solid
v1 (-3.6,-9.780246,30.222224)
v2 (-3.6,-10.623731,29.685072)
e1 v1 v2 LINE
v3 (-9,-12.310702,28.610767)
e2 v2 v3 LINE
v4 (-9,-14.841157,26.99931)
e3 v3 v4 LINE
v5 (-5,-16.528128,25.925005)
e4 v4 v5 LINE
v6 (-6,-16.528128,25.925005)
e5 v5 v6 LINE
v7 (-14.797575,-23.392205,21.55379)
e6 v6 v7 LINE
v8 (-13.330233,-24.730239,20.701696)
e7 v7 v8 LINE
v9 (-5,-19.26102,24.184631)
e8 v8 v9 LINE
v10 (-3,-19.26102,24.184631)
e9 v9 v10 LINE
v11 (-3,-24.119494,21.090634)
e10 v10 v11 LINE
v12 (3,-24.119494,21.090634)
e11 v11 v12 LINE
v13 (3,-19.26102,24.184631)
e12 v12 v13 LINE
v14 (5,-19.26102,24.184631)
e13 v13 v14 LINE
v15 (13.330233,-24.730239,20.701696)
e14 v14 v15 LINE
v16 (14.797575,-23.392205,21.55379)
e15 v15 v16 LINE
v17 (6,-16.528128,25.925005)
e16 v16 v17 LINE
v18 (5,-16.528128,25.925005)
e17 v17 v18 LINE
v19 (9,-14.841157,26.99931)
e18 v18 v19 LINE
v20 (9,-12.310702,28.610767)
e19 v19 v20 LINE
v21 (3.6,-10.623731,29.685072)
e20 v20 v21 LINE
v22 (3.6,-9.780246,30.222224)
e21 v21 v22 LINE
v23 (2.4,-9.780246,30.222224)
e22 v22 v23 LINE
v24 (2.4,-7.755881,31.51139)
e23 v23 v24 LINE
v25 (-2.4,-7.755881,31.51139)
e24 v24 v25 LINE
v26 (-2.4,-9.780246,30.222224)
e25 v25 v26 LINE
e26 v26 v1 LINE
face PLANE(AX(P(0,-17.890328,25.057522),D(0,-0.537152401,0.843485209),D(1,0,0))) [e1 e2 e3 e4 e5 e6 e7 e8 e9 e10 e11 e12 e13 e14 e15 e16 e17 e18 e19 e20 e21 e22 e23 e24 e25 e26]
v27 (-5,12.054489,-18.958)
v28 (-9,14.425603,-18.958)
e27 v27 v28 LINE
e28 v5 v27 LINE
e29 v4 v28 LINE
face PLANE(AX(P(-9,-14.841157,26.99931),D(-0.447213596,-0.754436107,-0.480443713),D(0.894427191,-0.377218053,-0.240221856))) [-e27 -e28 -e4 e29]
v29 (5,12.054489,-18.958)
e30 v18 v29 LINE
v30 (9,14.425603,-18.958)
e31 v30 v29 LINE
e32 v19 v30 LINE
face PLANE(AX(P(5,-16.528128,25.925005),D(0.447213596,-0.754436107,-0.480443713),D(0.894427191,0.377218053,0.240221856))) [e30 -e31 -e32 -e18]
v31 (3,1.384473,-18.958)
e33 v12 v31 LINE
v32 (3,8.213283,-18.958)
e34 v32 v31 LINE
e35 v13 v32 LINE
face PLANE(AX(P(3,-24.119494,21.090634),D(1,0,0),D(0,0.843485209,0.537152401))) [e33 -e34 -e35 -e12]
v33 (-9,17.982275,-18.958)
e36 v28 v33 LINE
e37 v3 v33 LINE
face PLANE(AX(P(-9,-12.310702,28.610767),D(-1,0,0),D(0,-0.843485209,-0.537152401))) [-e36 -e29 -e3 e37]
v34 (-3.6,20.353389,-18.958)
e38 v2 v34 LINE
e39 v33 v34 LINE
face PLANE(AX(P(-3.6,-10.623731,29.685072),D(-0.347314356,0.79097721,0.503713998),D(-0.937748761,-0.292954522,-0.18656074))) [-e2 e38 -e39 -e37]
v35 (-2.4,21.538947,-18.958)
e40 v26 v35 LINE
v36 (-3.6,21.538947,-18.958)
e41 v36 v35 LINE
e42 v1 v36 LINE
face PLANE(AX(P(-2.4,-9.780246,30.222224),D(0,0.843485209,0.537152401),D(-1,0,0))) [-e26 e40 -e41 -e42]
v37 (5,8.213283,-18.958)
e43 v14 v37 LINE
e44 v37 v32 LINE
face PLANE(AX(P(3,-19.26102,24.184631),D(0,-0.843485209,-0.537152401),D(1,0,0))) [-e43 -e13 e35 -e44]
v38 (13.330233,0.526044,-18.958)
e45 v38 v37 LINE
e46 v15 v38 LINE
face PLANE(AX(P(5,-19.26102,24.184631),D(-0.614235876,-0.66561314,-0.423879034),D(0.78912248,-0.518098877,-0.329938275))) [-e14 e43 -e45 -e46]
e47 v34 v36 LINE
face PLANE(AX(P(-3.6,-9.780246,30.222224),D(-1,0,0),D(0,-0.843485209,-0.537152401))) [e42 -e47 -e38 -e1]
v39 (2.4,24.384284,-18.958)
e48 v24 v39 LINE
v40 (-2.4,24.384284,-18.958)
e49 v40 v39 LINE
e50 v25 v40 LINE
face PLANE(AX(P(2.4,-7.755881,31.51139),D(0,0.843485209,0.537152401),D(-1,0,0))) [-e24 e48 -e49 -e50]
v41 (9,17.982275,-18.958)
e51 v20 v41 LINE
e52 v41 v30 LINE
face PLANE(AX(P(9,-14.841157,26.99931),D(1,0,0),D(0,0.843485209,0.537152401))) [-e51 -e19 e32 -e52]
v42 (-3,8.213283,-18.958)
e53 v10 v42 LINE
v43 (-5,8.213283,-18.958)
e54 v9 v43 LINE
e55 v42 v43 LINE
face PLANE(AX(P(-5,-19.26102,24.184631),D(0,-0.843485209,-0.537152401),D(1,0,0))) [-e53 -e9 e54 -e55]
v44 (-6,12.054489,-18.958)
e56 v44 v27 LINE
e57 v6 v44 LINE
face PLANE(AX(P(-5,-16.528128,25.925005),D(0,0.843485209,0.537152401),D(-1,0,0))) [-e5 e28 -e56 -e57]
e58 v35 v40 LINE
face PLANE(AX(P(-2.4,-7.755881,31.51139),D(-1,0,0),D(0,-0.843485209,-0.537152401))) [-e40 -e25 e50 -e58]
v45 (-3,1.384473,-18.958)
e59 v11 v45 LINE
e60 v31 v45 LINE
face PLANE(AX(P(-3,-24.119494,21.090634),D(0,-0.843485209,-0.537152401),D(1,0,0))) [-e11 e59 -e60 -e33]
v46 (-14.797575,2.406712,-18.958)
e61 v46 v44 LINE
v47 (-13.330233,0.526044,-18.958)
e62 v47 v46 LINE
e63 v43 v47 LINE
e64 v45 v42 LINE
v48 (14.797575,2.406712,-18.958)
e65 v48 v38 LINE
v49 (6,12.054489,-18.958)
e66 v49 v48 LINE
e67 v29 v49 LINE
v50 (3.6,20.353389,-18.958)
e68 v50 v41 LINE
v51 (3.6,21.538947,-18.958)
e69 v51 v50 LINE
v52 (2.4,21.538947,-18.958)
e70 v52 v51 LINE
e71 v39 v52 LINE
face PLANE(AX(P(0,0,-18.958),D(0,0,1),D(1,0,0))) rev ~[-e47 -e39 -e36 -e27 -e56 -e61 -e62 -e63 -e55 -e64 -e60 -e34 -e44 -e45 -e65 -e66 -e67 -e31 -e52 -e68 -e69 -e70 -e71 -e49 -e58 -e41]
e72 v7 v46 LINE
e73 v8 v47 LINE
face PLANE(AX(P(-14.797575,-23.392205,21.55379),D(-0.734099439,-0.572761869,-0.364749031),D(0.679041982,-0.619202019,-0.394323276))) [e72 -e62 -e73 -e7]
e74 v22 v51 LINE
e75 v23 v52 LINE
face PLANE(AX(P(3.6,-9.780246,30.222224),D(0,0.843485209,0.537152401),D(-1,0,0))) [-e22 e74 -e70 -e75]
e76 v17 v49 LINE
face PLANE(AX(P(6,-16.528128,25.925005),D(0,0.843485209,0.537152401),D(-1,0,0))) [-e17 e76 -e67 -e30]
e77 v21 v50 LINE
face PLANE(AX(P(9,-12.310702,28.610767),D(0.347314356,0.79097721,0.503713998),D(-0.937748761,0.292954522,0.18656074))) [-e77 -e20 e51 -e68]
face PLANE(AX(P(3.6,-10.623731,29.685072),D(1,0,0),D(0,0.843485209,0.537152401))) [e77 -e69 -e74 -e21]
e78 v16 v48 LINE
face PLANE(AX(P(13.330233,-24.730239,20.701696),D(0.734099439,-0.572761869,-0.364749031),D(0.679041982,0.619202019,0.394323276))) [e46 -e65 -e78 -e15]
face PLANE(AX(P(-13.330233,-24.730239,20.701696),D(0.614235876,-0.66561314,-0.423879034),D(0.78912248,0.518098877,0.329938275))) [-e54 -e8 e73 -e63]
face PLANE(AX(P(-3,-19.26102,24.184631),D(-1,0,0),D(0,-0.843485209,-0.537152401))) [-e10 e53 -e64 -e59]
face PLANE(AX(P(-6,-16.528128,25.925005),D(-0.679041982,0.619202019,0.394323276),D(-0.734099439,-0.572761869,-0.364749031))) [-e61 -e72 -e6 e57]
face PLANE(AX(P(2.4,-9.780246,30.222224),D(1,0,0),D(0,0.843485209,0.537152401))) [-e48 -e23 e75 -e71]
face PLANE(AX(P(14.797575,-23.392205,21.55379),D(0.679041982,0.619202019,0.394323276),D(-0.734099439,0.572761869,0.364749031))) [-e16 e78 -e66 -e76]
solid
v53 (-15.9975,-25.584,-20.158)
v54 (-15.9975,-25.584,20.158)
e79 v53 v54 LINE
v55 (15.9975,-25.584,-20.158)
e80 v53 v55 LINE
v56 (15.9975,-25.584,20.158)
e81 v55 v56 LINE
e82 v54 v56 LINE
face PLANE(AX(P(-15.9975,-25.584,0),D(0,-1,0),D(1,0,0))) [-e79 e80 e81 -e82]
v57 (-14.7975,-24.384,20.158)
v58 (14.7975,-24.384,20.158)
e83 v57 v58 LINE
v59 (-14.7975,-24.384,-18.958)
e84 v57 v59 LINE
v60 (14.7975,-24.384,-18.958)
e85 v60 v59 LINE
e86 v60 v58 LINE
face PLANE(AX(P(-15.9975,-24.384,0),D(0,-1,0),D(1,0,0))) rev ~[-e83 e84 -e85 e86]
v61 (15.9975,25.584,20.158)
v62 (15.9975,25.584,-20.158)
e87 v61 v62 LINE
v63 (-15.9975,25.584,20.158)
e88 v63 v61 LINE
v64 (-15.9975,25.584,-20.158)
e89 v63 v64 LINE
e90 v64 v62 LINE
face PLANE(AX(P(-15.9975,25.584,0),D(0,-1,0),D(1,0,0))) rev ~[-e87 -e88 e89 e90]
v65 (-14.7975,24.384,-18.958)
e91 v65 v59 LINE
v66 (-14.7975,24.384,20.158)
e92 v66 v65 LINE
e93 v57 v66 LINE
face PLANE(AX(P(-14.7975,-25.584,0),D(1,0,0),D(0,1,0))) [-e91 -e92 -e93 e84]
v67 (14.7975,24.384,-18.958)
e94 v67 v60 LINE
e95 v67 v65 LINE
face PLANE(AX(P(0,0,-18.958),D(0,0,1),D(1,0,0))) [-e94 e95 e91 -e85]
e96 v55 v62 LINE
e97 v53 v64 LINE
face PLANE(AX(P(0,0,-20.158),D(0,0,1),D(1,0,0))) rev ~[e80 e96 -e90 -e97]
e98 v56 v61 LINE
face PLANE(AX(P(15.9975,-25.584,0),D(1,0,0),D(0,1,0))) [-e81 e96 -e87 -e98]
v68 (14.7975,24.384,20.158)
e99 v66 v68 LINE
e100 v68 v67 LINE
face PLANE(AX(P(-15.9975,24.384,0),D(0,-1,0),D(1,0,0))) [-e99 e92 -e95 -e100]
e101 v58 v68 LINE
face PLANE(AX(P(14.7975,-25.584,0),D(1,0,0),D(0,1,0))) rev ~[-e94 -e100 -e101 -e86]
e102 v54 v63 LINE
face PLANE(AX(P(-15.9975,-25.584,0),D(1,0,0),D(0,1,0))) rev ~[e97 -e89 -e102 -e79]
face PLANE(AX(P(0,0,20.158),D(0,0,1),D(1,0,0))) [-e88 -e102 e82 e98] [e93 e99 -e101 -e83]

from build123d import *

# Parameters (mm, degrees)
F0_W     = 31.995
F0_H     = 51.168
F1_DEPTH = 20.158
F3_T     = -1.2
F5_REACH = 97.2809453654


with BuildPart() as f1:
    # F0 (on Top) → F1 (new body, symmetric)
    with BuildSketch(Plane.XY):
        Rectangle(F0_W, F0_H)
    extrude(amount=F1_DEPTH, both=True)

    # F3
    f3_openings = [f1.faces().sort_by_distance(p)[0] for p in [
        (0, 0, 20.158),
    ]]
    offset(amount=F3_T, openings=f3_openings)


with BuildPart() as f5:
    f5_end = Plane.XY.offset(-18.958)
    # F4 (on face) → F5 (new body, up to a plane its end follows)
    with BuildSketch(Plane(origin=(0, -16.5150093929, 25.9333592132), x_dir=(1, 0, 0), z_dir=(0, -0.5371524006, 0.8434852094))):
        Polygon((3, -3.2555523465), (5, -3.2555523465), (13.3302325572, -9.7396252559), (14.7975749325, -8.1533091782), (6, -0.0155523465), (5, -0.0155523465), (9, 1.9844476535), (9, 4.9844476535), (3.6, 6.9844476535), (3.6, 7.9844476535), (2.4, 7.9844476535), (2.4, 10.3844476535), (0, 10.3844476535), (-2.4, 10.3844476535), (-2.4, 7.9844476535), (-3.6, 7.9844476535), (-3.6, 6.9844476535), (-9, 4.9844476535), (-9, 1.9844476535), (-5, -0.0155523465), (-6, -0.0155523465), (-14.7975749325, -8.1533091782), (-13.3302325572, -9.7396252559), (-5, -3.2555523465), (-3, -3.2555523465), (-3, -9.0155523465), (0, -9.0155523465), (3, -9.0155523465), align=None)
    f5_long = extrude(amount=-F5_REACH, mode=Mode.PRIVATE)
    add(split(f5_long, bisect_by=f5_end, keep=Keep.TOP, mode=Mode.PRIVATE))


solid = Compound([f1.part, f5.part])
